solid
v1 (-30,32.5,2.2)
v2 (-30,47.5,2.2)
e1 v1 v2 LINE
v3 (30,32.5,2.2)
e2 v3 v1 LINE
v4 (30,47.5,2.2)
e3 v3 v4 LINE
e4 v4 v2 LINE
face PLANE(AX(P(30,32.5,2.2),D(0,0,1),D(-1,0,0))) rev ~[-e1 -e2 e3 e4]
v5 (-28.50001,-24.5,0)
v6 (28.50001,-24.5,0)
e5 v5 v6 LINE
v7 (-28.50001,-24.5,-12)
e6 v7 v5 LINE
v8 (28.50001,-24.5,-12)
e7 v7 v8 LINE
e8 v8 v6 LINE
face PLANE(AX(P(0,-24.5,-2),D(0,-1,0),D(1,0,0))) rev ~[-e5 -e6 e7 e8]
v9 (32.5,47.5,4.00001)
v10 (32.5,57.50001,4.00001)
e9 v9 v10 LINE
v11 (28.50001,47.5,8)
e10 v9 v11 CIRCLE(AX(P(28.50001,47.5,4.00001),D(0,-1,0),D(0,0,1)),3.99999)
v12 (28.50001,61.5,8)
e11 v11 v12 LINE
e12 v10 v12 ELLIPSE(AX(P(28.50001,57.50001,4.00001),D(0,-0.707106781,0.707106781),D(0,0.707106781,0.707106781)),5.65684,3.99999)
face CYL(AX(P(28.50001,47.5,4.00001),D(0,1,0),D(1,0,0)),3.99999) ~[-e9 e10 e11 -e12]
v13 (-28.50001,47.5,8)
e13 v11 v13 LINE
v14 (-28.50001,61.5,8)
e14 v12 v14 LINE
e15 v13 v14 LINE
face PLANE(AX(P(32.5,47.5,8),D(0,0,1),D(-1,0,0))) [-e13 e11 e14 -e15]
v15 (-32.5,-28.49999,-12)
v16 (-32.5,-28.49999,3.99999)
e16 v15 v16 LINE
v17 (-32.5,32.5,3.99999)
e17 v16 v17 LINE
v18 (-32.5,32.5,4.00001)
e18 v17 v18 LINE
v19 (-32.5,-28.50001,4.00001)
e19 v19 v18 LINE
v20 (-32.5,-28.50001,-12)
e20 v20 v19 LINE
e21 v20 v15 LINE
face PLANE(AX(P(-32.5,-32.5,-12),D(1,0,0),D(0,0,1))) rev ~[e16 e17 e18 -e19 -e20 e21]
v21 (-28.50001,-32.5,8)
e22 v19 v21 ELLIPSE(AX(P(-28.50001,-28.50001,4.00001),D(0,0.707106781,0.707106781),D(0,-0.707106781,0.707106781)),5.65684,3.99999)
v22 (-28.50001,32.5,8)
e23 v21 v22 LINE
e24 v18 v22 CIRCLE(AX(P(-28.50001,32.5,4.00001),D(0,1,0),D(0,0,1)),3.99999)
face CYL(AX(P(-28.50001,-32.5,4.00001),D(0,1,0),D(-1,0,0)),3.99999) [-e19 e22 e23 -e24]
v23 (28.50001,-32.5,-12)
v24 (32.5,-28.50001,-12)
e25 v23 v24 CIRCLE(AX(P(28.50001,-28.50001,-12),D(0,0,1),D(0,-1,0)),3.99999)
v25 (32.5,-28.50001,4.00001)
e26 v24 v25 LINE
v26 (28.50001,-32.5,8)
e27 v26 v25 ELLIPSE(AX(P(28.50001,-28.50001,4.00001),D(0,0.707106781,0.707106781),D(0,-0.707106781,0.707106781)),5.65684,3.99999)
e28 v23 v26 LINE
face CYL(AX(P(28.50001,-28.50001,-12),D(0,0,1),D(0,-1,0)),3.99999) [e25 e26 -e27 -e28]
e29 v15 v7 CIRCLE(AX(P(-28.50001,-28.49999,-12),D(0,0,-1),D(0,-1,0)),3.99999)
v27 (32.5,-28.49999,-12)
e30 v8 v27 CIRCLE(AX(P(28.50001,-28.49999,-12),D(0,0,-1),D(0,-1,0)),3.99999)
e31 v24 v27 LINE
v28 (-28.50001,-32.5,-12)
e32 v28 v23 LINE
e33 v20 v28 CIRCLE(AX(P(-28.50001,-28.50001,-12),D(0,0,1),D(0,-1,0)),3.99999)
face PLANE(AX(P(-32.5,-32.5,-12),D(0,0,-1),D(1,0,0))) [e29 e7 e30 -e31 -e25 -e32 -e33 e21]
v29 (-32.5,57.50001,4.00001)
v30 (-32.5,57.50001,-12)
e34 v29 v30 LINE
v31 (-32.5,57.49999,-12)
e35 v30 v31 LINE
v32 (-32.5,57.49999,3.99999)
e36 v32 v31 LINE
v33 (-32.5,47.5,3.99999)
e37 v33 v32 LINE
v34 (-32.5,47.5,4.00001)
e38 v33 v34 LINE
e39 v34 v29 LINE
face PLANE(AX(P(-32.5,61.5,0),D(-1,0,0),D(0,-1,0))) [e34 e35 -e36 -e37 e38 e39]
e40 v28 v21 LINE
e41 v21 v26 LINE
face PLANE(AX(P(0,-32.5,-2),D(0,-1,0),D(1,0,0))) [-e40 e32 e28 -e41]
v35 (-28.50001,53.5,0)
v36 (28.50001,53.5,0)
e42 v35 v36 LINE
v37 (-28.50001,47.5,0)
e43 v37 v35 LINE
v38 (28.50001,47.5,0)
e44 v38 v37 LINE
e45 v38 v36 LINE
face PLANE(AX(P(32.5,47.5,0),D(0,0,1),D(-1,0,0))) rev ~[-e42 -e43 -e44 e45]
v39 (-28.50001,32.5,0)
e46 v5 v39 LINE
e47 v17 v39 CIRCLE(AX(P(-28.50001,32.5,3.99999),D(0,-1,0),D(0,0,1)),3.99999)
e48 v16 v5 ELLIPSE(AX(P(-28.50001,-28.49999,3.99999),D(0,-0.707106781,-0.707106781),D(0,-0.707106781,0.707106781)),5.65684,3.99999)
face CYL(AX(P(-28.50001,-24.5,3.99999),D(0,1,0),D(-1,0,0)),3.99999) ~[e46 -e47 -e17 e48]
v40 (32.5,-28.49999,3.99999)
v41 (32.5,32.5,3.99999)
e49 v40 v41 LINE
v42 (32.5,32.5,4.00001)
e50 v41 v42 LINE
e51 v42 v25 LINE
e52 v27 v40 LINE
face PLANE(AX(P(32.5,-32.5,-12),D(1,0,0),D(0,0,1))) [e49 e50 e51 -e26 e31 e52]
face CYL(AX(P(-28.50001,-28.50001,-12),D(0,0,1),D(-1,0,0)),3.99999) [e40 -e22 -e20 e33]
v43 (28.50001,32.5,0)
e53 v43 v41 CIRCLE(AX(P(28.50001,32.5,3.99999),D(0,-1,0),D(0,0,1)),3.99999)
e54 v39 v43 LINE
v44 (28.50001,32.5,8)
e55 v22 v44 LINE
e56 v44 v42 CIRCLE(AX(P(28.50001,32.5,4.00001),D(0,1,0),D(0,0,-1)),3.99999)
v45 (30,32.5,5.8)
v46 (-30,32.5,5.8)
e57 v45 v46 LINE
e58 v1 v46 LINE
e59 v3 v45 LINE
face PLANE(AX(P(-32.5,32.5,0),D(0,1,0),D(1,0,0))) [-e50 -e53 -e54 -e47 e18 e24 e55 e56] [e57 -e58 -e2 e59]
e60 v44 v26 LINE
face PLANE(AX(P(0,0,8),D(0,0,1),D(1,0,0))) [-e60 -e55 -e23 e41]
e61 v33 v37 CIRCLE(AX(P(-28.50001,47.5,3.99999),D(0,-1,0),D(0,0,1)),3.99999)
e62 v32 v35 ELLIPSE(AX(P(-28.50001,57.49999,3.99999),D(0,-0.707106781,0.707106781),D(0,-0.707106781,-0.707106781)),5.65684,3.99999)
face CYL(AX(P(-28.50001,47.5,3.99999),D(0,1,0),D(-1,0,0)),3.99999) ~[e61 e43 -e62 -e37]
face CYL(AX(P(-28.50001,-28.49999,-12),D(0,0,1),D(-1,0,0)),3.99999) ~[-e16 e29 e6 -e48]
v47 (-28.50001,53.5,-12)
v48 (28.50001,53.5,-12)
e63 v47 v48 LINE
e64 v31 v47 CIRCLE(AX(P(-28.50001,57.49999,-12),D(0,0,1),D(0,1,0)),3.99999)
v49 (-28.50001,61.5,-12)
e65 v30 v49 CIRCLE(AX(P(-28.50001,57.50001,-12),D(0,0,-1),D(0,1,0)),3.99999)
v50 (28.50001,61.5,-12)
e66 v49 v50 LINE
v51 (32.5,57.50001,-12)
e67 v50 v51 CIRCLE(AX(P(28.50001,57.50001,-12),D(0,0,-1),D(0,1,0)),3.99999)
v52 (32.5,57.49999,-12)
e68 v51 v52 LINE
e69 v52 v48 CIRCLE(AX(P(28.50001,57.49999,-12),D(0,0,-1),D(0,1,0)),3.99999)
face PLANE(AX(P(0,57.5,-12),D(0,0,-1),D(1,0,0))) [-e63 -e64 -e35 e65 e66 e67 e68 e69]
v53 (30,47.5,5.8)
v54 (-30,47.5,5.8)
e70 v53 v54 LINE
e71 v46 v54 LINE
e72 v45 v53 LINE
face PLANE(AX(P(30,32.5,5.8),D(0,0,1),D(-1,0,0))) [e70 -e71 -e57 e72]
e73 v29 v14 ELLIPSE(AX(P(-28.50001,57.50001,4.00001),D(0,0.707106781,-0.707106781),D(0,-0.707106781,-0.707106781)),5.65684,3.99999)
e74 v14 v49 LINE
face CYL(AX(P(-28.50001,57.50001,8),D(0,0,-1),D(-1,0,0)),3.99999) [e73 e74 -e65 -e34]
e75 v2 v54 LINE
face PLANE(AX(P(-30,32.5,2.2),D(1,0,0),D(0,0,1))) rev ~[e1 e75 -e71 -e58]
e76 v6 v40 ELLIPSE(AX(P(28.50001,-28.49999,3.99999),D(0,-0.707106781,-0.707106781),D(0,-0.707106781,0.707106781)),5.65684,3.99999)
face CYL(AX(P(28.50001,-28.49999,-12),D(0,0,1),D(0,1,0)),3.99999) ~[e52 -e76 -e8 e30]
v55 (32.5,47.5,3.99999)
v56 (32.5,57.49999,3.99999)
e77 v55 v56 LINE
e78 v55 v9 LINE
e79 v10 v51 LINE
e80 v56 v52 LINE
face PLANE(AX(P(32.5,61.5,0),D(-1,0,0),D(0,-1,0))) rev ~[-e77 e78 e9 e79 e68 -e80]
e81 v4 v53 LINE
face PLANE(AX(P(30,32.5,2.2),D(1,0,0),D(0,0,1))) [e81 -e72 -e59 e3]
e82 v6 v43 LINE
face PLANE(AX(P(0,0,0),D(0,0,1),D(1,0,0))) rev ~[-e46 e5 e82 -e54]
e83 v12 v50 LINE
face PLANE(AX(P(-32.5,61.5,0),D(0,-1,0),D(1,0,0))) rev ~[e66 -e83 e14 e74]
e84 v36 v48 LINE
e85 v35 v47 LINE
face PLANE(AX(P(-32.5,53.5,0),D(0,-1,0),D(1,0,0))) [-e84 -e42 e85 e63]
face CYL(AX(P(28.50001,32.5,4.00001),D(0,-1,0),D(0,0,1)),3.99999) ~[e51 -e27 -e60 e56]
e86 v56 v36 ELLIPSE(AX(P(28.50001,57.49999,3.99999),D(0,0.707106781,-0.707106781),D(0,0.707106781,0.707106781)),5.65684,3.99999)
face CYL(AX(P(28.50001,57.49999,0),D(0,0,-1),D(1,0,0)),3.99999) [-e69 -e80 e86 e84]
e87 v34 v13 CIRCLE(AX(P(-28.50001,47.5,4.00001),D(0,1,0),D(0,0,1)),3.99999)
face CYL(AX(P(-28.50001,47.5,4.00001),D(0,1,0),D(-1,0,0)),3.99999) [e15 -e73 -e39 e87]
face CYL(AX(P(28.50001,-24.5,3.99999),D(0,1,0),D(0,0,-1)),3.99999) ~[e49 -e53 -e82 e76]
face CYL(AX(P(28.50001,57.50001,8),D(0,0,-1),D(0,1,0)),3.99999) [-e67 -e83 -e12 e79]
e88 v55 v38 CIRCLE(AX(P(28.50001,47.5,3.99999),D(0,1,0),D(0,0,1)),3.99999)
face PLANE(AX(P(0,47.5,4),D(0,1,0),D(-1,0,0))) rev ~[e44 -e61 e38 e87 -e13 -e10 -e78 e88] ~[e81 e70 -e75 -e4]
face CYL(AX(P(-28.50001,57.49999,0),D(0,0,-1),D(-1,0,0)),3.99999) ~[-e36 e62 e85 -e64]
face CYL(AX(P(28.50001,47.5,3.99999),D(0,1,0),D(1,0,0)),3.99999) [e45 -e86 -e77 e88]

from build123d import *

# Parameters (mm, degrees)
F0_W      = 65
F0_H      = 65
F1_DEPTH  = 8
F2_W      = 65
F2_H      = 20
F3_DEPTH  = 8
F4_W      = 60
F4_H      = 3.6
F5_DEPTH  = 15
F6_R      = 3.99999
F7_W      = 65
F7_H      = 8
F8_DEPTH  = 14
F9_W      = 65
F9_H      = 8
F10_DEPTH = 12
F11_R     = 3.99999


# Not quite as in the source:
# - a fillet or chamfer is up to 0.001 mm smaller than in the source, because OpenCascade refuses the exact size


with BuildPart() as f1:
    # F0 (on Top) → F1 (new body)
    with BuildSketch(Plane.XY):
        Rectangle(F0_W, F0_H)
    extrude(amount=F1_DEPTH)

    # F2 (on face) → F3 (join)
    with BuildSketch(Plane.XZ.offset(32.5)):
        with Locations((0, -2)):
            Rectangle(F2_W, F2_H)
    extrude(amount=-F3_DEPTH)

    # F4 (on face) → F5 (join)
    with BuildSketch(Plane(origin=(0, 32.5, 0), x_dir=(-1, 0, 0), z_dir=(0, 1, 0))):
        with Locations((0, 4)):
            Rectangle(F4_W, F4_H)
    extrude(amount=F5_DEPTH)

    # F6 (radius 4 in the source; OpenCascade refuses exactly that, so slightly less here)
    f6_edges = [f1.edges().sort_by_distance(p)[0] for p in [
        (-32.5, -24.5, -6),
        (-32.5, -32.5, -2),
        (32.5, -24.5, -6),
        (32.5, -32.5, -2),
        (32.5, 0, 8),
        (-32.5, 0, 8),
        (32.5, 4, 0),
        (-32.5, 4, 0),
    ]]
    fillet(f6_edges, radius=F6_R)

    # F7 (on face) → F8 (join)
    with BuildSketch(Plane(origin=(0, 47.5, 0), x_dir=(-1, 0, 0), z_dir=(0, 1, 0))):
        with Locations((0, 4)):
            Rectangle(F7_W, F7_H)
    extrude(amount=F8_DEPTH)

    # F9 (on face) → F10 (join, through all)
    with BuildSketch(Plane(origin=(0, 0, 0), x_dir=(1, 0, 0), z_dir=(0, 0, -1))):
        with Locations((0, -57.5)):
            Rectangle(F9_W, F9_H)
    extrude(amount=F10_DEPTH)

    # F11 (radius 4 in the source; OpenCascade refuses exactly that, so slightly less here)
    f11_edges = [f1.edges().sort_by_distance(p)[0] for p in [
        (-32.5, 61.5, -2),
        (-32.5, 53.5, -6),
        (-32.5, 50.5, 0),
        (-32.5, 54.5, 8),
        (32.5, 50.5, 0),
        (32.5, 54.5, 8),
        (32.5, 61.5, -2),
        (32.5, 53.5, -6),
    ]]
    fillet(f11_edges, radius=F11_R)


solid = f1.part
